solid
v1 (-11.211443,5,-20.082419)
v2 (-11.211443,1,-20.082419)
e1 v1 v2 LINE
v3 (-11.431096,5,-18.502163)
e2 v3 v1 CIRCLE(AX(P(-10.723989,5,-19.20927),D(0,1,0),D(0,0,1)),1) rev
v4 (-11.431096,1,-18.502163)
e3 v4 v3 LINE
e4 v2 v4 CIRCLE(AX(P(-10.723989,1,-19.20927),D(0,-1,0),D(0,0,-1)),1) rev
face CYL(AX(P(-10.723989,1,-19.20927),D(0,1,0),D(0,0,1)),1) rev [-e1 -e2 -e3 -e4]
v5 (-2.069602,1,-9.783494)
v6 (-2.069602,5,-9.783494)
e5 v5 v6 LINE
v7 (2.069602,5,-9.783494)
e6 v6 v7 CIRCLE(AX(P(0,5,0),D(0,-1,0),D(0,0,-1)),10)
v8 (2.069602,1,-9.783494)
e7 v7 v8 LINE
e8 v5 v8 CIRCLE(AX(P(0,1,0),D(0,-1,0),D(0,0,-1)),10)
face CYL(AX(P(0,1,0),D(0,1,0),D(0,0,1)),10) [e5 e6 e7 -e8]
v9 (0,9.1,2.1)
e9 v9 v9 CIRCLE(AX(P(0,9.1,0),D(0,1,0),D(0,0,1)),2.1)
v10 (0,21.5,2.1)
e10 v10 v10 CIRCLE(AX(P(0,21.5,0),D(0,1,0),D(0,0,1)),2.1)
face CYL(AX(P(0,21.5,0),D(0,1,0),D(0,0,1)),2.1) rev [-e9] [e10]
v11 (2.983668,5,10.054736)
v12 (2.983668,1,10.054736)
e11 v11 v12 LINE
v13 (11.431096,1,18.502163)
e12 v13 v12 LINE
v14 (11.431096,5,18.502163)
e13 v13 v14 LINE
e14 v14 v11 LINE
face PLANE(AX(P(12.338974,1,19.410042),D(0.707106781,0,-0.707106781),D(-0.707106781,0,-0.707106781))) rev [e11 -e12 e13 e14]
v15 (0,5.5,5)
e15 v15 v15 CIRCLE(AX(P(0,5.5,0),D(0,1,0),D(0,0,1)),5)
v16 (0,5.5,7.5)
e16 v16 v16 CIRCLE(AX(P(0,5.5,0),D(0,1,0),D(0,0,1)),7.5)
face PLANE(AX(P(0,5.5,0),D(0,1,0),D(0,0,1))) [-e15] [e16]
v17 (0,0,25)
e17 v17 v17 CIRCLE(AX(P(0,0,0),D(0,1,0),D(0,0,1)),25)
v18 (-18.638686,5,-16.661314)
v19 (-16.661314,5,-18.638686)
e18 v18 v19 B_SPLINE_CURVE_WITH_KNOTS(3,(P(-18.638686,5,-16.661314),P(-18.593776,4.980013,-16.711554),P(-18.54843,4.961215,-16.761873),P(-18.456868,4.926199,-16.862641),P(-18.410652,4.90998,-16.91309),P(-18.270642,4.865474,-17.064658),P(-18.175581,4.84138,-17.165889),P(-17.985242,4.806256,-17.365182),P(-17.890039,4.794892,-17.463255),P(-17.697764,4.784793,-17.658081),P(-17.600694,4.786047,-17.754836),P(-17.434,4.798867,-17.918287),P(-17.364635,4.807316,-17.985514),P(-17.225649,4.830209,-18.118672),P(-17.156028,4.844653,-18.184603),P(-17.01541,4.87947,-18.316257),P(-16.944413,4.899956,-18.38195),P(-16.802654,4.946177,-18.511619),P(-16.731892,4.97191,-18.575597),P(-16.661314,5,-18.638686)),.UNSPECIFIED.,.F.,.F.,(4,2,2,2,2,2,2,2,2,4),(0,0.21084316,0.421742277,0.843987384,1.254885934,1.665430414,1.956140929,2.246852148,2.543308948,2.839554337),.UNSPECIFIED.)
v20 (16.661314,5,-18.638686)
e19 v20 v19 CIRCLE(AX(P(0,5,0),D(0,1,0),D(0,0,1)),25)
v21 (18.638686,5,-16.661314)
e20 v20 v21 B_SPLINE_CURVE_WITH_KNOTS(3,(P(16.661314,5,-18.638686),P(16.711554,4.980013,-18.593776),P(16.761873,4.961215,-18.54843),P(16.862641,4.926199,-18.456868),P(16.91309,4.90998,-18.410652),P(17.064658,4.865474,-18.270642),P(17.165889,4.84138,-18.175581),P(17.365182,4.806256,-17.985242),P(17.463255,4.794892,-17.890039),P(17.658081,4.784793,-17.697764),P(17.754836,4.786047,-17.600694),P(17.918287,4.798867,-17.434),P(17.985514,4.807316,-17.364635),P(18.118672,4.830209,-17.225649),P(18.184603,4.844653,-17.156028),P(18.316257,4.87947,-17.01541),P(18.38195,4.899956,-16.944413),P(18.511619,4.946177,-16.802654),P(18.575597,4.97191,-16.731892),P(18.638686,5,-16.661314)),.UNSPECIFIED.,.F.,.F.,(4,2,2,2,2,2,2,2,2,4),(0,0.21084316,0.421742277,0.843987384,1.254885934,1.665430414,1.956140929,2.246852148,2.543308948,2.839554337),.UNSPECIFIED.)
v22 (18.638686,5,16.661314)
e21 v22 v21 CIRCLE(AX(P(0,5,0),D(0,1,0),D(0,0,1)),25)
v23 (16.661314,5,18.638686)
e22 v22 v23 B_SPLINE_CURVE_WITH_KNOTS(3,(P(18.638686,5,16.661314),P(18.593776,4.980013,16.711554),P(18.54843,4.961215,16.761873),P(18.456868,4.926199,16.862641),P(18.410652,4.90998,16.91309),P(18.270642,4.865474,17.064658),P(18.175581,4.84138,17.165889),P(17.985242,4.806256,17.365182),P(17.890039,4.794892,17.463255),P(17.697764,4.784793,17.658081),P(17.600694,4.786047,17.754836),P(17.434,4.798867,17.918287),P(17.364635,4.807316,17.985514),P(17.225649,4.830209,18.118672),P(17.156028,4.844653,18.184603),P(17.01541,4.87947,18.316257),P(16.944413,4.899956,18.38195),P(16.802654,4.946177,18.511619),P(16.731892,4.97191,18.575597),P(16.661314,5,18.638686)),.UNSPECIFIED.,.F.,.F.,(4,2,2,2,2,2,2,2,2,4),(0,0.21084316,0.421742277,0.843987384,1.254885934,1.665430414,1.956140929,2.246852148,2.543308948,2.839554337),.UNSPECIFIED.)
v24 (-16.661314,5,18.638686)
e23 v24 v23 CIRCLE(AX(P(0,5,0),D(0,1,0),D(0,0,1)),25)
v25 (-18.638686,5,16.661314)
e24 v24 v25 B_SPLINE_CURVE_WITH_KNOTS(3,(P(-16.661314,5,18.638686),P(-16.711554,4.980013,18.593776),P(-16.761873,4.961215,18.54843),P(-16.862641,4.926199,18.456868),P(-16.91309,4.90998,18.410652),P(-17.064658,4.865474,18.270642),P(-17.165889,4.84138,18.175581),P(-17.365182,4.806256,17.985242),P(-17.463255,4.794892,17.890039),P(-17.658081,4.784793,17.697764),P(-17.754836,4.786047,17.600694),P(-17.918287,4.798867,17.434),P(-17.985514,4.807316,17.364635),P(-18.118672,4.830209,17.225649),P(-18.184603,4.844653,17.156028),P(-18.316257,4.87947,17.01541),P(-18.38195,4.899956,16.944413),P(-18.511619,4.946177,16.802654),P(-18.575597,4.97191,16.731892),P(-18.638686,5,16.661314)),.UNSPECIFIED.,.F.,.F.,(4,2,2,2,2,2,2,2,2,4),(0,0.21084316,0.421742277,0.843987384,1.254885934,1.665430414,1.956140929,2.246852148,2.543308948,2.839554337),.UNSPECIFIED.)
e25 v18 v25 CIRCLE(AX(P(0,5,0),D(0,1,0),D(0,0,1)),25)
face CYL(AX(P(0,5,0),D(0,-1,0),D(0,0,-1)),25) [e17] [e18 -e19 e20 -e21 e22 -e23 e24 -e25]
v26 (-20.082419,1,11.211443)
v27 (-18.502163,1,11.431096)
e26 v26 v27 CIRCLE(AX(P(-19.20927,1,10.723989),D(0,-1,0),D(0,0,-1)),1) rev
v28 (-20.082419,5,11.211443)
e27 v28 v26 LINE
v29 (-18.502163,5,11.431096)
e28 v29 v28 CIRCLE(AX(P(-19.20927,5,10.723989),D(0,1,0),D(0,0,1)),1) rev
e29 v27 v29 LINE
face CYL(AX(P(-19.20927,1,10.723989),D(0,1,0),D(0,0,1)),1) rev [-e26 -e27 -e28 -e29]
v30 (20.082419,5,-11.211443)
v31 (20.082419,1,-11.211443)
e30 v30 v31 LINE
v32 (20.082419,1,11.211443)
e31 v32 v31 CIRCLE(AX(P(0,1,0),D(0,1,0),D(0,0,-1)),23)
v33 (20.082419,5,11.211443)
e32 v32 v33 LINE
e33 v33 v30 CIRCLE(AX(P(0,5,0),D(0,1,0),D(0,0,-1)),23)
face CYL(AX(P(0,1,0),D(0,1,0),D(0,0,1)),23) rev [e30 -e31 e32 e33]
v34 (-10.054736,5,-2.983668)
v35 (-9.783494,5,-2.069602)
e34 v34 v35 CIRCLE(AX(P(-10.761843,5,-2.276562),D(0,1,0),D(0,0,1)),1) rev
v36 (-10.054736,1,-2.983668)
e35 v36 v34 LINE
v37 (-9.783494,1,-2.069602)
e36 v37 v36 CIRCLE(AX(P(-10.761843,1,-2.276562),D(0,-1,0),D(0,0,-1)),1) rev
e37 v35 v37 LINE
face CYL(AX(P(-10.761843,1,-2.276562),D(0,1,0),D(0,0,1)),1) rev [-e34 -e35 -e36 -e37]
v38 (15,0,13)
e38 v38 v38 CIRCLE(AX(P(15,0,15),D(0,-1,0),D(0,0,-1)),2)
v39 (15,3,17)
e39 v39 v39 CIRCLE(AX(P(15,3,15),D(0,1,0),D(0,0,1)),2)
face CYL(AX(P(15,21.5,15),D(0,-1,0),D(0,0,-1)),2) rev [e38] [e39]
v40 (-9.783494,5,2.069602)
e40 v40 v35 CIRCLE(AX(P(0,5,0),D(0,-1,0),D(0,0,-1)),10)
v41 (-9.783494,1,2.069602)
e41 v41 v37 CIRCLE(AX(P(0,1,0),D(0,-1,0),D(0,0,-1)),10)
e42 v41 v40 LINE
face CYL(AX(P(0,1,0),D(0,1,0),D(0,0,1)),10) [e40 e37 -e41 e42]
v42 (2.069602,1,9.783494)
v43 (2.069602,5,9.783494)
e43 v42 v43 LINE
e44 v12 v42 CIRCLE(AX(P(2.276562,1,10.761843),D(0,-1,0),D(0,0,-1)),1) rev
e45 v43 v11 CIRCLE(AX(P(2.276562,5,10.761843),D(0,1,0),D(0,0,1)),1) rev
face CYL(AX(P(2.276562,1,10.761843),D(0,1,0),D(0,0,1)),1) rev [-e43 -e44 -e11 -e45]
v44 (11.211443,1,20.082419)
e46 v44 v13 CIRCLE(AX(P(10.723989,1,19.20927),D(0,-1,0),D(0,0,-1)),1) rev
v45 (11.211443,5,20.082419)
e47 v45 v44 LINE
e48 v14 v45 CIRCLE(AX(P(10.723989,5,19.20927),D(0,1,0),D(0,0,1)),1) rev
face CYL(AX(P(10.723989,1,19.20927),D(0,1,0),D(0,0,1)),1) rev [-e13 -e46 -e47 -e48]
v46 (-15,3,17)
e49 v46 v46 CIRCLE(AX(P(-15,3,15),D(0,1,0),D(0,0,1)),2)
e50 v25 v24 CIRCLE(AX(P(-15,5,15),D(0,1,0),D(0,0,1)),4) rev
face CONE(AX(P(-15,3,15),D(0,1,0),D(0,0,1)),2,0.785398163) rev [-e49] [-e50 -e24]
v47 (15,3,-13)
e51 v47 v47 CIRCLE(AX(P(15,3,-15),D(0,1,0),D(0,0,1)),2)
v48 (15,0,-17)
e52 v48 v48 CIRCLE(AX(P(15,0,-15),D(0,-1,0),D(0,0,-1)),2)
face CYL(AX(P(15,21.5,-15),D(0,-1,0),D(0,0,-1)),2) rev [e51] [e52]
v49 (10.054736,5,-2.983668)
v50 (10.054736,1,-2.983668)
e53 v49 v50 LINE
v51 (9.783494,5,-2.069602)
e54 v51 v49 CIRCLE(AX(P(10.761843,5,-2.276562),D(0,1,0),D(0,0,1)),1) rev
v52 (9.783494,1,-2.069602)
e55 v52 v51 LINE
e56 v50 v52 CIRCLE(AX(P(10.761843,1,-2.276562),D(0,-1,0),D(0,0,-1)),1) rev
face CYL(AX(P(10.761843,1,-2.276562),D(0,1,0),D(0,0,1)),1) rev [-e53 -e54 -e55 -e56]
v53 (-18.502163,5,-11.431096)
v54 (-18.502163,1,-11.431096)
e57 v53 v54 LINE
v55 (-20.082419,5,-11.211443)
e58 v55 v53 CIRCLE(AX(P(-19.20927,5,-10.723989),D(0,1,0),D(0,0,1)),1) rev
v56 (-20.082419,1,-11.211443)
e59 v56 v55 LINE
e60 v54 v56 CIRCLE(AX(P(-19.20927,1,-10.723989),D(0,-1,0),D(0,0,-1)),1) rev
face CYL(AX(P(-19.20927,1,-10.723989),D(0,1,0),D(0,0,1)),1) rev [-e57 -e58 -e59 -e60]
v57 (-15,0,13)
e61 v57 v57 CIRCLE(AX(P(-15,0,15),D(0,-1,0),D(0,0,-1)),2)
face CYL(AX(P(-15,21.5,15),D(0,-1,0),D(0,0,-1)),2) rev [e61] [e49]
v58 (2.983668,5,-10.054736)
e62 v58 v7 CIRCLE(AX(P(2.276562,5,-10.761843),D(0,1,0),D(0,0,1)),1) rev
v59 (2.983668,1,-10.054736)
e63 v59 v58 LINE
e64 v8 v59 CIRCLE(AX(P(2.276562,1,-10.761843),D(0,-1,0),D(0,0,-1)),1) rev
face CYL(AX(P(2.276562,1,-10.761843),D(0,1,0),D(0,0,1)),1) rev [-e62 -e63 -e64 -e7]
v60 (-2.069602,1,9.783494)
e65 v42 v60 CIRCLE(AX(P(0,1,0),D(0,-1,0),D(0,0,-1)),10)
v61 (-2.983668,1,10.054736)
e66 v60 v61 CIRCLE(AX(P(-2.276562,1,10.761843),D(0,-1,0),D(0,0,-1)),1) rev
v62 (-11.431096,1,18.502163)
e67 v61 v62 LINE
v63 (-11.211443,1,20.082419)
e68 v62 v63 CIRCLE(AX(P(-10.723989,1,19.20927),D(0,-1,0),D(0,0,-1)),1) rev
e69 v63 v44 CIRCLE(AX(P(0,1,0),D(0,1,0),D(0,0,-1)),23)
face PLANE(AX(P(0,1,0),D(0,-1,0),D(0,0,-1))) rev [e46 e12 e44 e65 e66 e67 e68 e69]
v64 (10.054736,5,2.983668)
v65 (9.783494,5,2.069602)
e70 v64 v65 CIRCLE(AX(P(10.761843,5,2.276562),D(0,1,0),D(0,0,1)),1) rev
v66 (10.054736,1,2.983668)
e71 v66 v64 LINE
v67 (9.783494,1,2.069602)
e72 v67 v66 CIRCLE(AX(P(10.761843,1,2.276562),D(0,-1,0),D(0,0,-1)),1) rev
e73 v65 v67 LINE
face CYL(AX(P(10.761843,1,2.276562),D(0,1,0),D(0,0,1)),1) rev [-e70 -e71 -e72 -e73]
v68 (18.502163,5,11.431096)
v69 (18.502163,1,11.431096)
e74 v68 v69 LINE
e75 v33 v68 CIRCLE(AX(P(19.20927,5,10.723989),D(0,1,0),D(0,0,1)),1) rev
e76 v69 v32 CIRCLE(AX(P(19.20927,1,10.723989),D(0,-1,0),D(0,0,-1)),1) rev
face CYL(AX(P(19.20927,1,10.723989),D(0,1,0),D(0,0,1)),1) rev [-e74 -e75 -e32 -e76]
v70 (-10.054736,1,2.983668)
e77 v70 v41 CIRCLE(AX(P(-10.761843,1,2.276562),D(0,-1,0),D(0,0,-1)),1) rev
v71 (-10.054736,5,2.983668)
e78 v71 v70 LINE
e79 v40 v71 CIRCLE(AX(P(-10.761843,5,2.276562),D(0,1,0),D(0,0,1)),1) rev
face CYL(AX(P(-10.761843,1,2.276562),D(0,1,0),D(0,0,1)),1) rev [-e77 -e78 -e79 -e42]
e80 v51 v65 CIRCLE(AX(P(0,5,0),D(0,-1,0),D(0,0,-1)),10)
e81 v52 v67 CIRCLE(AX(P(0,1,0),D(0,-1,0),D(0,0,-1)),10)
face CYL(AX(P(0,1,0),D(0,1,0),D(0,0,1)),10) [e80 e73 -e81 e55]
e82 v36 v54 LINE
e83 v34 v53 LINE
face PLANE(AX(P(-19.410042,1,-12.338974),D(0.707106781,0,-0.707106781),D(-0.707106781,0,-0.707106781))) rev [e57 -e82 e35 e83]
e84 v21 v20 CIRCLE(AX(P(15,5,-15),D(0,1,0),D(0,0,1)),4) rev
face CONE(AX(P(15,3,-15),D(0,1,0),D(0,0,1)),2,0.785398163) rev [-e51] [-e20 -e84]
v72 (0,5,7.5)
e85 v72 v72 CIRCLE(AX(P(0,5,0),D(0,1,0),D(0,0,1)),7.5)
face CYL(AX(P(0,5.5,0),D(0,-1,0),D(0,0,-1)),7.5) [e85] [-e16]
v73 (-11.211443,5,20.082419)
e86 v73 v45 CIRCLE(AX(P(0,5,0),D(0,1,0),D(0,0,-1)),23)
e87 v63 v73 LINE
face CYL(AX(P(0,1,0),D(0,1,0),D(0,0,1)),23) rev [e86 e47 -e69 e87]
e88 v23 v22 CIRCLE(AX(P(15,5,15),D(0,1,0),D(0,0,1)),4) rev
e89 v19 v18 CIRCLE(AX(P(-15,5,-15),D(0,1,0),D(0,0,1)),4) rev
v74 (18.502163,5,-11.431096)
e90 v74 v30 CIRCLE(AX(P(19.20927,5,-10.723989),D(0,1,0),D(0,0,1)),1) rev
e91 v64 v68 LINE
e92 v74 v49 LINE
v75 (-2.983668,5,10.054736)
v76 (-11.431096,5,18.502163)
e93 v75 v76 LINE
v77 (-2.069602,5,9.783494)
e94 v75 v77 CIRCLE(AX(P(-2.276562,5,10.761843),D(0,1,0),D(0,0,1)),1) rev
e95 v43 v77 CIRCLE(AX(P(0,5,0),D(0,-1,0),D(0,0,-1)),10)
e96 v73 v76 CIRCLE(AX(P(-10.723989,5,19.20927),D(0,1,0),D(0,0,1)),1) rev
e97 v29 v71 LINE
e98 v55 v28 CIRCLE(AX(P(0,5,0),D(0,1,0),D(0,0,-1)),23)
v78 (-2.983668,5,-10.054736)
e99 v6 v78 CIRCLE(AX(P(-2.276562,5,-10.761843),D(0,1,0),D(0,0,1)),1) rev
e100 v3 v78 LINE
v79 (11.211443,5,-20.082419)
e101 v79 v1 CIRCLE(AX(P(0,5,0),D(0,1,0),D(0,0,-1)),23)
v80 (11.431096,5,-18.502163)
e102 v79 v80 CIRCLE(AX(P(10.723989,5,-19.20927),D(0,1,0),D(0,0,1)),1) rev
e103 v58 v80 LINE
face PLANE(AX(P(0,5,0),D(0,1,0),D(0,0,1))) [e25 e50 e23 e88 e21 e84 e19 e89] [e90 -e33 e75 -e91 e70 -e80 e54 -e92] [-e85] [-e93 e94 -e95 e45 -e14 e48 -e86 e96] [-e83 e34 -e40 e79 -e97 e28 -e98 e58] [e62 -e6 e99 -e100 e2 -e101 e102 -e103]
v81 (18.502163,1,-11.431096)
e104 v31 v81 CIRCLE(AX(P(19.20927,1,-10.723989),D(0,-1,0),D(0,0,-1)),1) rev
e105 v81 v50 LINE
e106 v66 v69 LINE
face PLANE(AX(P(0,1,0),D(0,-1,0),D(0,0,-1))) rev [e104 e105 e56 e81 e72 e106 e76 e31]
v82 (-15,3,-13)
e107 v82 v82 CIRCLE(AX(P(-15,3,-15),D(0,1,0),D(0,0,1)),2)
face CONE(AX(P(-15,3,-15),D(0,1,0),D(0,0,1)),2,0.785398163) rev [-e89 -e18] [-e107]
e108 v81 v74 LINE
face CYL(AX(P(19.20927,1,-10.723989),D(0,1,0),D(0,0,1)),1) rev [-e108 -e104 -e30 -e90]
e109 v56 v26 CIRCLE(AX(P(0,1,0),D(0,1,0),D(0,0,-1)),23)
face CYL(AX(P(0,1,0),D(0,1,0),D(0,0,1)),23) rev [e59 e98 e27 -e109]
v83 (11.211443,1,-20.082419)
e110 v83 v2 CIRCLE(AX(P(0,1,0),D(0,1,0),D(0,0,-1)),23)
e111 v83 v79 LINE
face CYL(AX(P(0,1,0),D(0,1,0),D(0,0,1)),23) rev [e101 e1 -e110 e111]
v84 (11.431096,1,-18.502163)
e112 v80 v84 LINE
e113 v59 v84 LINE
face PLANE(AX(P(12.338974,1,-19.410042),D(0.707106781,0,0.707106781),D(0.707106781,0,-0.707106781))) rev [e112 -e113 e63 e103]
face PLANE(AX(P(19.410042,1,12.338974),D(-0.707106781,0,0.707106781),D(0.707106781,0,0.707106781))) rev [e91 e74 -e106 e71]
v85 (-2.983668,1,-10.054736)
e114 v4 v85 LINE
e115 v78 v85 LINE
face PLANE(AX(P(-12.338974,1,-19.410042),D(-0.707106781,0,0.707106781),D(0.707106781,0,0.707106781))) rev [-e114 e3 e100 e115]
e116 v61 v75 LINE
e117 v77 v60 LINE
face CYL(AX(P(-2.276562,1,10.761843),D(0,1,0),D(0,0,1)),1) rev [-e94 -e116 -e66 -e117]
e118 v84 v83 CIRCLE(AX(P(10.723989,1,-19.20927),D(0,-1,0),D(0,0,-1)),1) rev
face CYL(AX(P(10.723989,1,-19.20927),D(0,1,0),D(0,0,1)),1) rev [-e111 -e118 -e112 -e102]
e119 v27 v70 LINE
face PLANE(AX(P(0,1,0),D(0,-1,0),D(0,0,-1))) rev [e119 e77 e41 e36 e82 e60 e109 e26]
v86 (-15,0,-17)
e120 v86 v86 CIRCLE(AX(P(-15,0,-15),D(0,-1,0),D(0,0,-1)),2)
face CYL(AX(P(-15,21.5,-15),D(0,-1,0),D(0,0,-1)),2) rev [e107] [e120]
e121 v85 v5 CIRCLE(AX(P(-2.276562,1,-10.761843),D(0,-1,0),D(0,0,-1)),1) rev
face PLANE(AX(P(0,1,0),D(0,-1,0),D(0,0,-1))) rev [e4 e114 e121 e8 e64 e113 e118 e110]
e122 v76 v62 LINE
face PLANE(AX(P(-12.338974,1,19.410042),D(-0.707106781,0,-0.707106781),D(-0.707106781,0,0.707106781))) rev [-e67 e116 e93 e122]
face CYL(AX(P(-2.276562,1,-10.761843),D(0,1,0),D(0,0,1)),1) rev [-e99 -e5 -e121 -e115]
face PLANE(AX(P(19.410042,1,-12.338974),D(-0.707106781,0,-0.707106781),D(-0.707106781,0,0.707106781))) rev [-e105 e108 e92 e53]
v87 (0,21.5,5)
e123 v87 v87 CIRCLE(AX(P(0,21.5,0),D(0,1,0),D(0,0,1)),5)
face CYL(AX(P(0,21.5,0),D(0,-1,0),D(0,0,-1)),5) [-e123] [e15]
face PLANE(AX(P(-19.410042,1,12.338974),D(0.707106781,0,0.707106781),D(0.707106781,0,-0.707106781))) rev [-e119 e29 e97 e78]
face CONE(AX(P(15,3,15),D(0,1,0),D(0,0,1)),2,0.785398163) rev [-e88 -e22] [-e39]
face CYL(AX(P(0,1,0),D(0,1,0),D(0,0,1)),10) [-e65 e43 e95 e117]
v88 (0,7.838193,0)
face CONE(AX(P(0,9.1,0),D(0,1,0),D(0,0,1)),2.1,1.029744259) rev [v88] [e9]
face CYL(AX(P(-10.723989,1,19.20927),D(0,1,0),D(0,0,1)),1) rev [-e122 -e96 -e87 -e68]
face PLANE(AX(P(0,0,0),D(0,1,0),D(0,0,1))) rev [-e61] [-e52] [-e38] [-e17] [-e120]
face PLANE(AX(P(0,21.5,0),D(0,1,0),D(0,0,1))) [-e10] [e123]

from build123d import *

# Parameters (mm, degrees)
SKETCH_1_R             = 25
EXTRUDE_1_DEPTH        = 5
SKETCH_3_R             = 7.5
EXTRUDE_2_DEPTH        = 0.5
SKETCH_4_R             = 5
EXTRUDE_3_DEPTH        = 16
SKETCH_8_R             = 2
CUT_EXTRUDE_2_DEPTH    = 42.379342672
CHAMFER_1_SIZE         = 2
CUT_EXTRUDE_5_DEPTH    = 4
FILLET_1_R             = 1
HOLE_WIZARD_M5_1_D     = 4.2
HOLE_WIZARD_M5_1_DEPTH = 12.4
HOLE_WIZARD_M5_1_TIP   = 1.2618073


with BuildPart() as part:
    # 草图1 → 凸台-拉伸1 (new body)
    with BuildSketch(Plane(origin=(0, 0, 0), x_dir=(1, 0, 0), z_dir=(0, 1, 0))):
        with Locations(Location((0, 0, 0), (0, 0, 270))):
            Circle(SKETCH_1_R)
    extrude(amount=EXTRUDE_1_DEPTH)

    # 草图3 → 凸台-拉伸2 (add)
    with BuildSketch(Plane(origin=(0, 5, 0), x_dir=(1, 0, 0), z_dir=(0, 1, 0))):
        with Locations(Location((0, 0, 0), (0, 0, 270))):
            Circle(SKETCH_3_R)
    extrude(amount=EXTRUDE_2_DEPTH)

    # 草图4 → 凸台-拉伸3 (add)
    with BuildSketch(Plane(origin=(0, 5.5, 0), x_dir=(1, 0, 0), z_dir=(0, 1, 0))):
        with Locations(Location((0, 0, 0), (0, 0, 270))):
            Circle(SKETCH_4_R)
    extrude(amount=EXTRUDE_3_DEPTH)

    # 草图8 → 切除-拉伸2 (cut, through all)
    with BuildSketch(Plane(origin=(0, 0, 0), x_dir=(-1, 0, 0), z_dir=(0, -1, 0))):
        with Locations(Location((-15, -15, 0), (0, 0, 90))):
            Circle(SKETCH_8_R)
        with Locations(Location((15, -15, 0), (0, 0, 90))):
            Circle(SKETCH_8_R)
        with Locations(Location((15, 15, 0), (0, 0, 90))):
            Circle(SKETCH_8_R)
        with Locations(Location((-15, 15, 0), (0, 0, 90))):
            Circle(SKETCH_8_R)
    extrude(amount=-CUT_EXTRUDE_2_DEPTH, mode=Mode.SUBTRACT)

    # 倒角1
    # the kernel refuses this chamfer: 2 mm, written as the material it takes off along each edge
    with BuildSketch(Plane(origin=(15, 5, -15), x_dir=(0, 0, -1), z_dir=(-1, 0, 0))) as chamfer_1_piece_1:
        Polygon((2 + CHAMFER_1_SIZE, 0), (2, CHAMFER_1_SIZE), (2, 0), align=None)
    revolve(axis=Axis((15, 5, -15), (0, -1, 0)), mode=Mode.SUBTRACT)
    with BuildSketch(Plane(origin=(-15, 5, -15), x_dir=(0, 0, -1), z_dir=(-1, 0, 0))) as chamfer_1_piece_2:
        Polygon((2 + CHAMFER_1_SIZE, 0), (2, CHAMFER_1_SIZE), (2, 0), align=None)
    revolve(axis=Axis((-15, 5, -15), (0, -1, 0)), mode=Mode.SUBTRACT)
    with BuildSketch(Plane(origin=(-15, 5, 15), x_dir=(0, 0, -1), z_dir=(-1, 0, 0))) as chamfer_1_piece_3:
        Polygon((2 + CHAMFER_1_SIZE, 0), (2, CHAMFER_1_SIZE), (2, 0), align=None)
    revolve(axis=Axis((-15, 5, 15), (0, -1, 0)), mode=Mode.SUBTRACT)
    with BuildSketch(Plane(origin=(15, 5, 15), x_dir=(0, 0, -1), z_dir=(-1, 0, 0))) as chamfer_1_piece_4:
        Polygon((2 + CHAMFER_1_SIZE, 0), (2, CHAMFER_1_SIZE), (2, 0), align=None)
    revolve(axis=Axis((15, 5, 15), (0, -1, 0)), mode=Mode.SUBTRACT)

    # 草图13 → 切除-拉伸5 (cut)
    with BuildSketch(Plane(origin=(0, 5, 0), x_dir=(1, 0, 0), z_dir=(0, 1, 0))):
        with BuildLine():
            Line((-12.33897396, 19.410041772), (-2.588190451, 9.659258263))
            ThreePointArc((-2.588190451, 9.659258263), (0, 10), (2.588190451, 9.659258263))
            Line((2.588190451, 9.659258263), (12.33897396, 19.410041772))
            ThreePointArc((12.33897396, 19.410041772), (0, 23), (-12.33897396, 19.410041772))
        make_face()
        with BuildLine():
            Line((19.410041772, -12.33897396), (9.659258263, -2.588190451))
            ThreePointArc((9.659258263, -2.588190451), (10, 0), (9.659258263, 2.588190451))
            Line((9.659258263, 2.588190451), (19.410041772, 12.33897396))
            ThreePointArc((19.410041772, 12.33897396), (23, 0), (19.410041772, -12.33897396))
        make_face()
        with BuildLine():
            Line((-12.33897396, -19.410041772), (-2.588190451, -9.659258263))
            ThreePointArc((-2.588190451, -9.659258263), (0, -10), (2.588190451, -9.659258263))
            Line((2.588190451, -9.659258263), (12.33897396, -19.410041772))
            ThreePointArc((12.33897396, -19.410041772), (0, -23), (-12.33897396, -19.410041772))
        make_face()
        with BuildLine():
            Line((-19.410041772, 12.33897396), (-9.659258263, 2.588190451))
            ThreePointArc((-9.659258263, 2.588190451), (-10, 0), (-9.659258263, -2.588190451))
            Line((-9.659258263, -2.588190451), (-19.410041772, -12.33897396))
            ThreePointArc((-19.410041772, -12.33897396), (-23, 0), (-19.410041772, 12.33897396))
        make_face()
    extrude(amount=-CUT_EXTRUDE_5_DEPTH, mode=Mode.SUBTRACT)

    # 圆角1
    fillet_1_edges = [part.edges().sort_by_distance(p)[0] for p in [
        (12.33897396, 3, 19.410041772),
        (-12.33897396, 3, 19.410041772),
        (-2.588190451, 3, 9.659258263),
        (2.588190451, 3, 9.659258263),
        (19.410041772, 3, -12.33897396),
        (19.410041772, 3, 12.33897396),
        (9.659258263, 3, 2.588190451),
        (9.659258263, 3, -2.588190451),
        (-19.410041772, 3, 12.33897396),
        (-19.410041772, 3, -12.33897396),
        (-9.659258263, 3, -2.588190451),
        (-9.659258263, 3, 2.588190451),
        (-12.33897396, 3, -19.410041772),
        (12.33897396, 3, -19.410041772),
        (2.588190451, 3, -9.659258263),
        (-2.588190451, 3, -9.659258263),
    ]]
    fillet(fillet_1_edges, radius=FILLET_1_R)

    # M5 螺纹孔1
    with Locations(Plane(origin=(0, 21.5, 0), x_dir=(1, 0, 0), z_dir=(0, 1, 0))):
        with Locations((0, 0)):
            Hole(HOLE_WIZARD_M5_1_D / 2, depth=HOLE_WIZARD_M5_1_DEPTH)
            with Locations((0, 0, -(HOLE_WIZARD_M5_1_DEPTH + HOLE_WIZARD_M5_1_TIP / 2))):  # 118° drill point
                Cone(0, HOLE_WIZARD_M5_1_D / 2, HOLE_WIZARD_M5_1_TIP, mode=Mode.SUBTRACT)


solid = part.part
